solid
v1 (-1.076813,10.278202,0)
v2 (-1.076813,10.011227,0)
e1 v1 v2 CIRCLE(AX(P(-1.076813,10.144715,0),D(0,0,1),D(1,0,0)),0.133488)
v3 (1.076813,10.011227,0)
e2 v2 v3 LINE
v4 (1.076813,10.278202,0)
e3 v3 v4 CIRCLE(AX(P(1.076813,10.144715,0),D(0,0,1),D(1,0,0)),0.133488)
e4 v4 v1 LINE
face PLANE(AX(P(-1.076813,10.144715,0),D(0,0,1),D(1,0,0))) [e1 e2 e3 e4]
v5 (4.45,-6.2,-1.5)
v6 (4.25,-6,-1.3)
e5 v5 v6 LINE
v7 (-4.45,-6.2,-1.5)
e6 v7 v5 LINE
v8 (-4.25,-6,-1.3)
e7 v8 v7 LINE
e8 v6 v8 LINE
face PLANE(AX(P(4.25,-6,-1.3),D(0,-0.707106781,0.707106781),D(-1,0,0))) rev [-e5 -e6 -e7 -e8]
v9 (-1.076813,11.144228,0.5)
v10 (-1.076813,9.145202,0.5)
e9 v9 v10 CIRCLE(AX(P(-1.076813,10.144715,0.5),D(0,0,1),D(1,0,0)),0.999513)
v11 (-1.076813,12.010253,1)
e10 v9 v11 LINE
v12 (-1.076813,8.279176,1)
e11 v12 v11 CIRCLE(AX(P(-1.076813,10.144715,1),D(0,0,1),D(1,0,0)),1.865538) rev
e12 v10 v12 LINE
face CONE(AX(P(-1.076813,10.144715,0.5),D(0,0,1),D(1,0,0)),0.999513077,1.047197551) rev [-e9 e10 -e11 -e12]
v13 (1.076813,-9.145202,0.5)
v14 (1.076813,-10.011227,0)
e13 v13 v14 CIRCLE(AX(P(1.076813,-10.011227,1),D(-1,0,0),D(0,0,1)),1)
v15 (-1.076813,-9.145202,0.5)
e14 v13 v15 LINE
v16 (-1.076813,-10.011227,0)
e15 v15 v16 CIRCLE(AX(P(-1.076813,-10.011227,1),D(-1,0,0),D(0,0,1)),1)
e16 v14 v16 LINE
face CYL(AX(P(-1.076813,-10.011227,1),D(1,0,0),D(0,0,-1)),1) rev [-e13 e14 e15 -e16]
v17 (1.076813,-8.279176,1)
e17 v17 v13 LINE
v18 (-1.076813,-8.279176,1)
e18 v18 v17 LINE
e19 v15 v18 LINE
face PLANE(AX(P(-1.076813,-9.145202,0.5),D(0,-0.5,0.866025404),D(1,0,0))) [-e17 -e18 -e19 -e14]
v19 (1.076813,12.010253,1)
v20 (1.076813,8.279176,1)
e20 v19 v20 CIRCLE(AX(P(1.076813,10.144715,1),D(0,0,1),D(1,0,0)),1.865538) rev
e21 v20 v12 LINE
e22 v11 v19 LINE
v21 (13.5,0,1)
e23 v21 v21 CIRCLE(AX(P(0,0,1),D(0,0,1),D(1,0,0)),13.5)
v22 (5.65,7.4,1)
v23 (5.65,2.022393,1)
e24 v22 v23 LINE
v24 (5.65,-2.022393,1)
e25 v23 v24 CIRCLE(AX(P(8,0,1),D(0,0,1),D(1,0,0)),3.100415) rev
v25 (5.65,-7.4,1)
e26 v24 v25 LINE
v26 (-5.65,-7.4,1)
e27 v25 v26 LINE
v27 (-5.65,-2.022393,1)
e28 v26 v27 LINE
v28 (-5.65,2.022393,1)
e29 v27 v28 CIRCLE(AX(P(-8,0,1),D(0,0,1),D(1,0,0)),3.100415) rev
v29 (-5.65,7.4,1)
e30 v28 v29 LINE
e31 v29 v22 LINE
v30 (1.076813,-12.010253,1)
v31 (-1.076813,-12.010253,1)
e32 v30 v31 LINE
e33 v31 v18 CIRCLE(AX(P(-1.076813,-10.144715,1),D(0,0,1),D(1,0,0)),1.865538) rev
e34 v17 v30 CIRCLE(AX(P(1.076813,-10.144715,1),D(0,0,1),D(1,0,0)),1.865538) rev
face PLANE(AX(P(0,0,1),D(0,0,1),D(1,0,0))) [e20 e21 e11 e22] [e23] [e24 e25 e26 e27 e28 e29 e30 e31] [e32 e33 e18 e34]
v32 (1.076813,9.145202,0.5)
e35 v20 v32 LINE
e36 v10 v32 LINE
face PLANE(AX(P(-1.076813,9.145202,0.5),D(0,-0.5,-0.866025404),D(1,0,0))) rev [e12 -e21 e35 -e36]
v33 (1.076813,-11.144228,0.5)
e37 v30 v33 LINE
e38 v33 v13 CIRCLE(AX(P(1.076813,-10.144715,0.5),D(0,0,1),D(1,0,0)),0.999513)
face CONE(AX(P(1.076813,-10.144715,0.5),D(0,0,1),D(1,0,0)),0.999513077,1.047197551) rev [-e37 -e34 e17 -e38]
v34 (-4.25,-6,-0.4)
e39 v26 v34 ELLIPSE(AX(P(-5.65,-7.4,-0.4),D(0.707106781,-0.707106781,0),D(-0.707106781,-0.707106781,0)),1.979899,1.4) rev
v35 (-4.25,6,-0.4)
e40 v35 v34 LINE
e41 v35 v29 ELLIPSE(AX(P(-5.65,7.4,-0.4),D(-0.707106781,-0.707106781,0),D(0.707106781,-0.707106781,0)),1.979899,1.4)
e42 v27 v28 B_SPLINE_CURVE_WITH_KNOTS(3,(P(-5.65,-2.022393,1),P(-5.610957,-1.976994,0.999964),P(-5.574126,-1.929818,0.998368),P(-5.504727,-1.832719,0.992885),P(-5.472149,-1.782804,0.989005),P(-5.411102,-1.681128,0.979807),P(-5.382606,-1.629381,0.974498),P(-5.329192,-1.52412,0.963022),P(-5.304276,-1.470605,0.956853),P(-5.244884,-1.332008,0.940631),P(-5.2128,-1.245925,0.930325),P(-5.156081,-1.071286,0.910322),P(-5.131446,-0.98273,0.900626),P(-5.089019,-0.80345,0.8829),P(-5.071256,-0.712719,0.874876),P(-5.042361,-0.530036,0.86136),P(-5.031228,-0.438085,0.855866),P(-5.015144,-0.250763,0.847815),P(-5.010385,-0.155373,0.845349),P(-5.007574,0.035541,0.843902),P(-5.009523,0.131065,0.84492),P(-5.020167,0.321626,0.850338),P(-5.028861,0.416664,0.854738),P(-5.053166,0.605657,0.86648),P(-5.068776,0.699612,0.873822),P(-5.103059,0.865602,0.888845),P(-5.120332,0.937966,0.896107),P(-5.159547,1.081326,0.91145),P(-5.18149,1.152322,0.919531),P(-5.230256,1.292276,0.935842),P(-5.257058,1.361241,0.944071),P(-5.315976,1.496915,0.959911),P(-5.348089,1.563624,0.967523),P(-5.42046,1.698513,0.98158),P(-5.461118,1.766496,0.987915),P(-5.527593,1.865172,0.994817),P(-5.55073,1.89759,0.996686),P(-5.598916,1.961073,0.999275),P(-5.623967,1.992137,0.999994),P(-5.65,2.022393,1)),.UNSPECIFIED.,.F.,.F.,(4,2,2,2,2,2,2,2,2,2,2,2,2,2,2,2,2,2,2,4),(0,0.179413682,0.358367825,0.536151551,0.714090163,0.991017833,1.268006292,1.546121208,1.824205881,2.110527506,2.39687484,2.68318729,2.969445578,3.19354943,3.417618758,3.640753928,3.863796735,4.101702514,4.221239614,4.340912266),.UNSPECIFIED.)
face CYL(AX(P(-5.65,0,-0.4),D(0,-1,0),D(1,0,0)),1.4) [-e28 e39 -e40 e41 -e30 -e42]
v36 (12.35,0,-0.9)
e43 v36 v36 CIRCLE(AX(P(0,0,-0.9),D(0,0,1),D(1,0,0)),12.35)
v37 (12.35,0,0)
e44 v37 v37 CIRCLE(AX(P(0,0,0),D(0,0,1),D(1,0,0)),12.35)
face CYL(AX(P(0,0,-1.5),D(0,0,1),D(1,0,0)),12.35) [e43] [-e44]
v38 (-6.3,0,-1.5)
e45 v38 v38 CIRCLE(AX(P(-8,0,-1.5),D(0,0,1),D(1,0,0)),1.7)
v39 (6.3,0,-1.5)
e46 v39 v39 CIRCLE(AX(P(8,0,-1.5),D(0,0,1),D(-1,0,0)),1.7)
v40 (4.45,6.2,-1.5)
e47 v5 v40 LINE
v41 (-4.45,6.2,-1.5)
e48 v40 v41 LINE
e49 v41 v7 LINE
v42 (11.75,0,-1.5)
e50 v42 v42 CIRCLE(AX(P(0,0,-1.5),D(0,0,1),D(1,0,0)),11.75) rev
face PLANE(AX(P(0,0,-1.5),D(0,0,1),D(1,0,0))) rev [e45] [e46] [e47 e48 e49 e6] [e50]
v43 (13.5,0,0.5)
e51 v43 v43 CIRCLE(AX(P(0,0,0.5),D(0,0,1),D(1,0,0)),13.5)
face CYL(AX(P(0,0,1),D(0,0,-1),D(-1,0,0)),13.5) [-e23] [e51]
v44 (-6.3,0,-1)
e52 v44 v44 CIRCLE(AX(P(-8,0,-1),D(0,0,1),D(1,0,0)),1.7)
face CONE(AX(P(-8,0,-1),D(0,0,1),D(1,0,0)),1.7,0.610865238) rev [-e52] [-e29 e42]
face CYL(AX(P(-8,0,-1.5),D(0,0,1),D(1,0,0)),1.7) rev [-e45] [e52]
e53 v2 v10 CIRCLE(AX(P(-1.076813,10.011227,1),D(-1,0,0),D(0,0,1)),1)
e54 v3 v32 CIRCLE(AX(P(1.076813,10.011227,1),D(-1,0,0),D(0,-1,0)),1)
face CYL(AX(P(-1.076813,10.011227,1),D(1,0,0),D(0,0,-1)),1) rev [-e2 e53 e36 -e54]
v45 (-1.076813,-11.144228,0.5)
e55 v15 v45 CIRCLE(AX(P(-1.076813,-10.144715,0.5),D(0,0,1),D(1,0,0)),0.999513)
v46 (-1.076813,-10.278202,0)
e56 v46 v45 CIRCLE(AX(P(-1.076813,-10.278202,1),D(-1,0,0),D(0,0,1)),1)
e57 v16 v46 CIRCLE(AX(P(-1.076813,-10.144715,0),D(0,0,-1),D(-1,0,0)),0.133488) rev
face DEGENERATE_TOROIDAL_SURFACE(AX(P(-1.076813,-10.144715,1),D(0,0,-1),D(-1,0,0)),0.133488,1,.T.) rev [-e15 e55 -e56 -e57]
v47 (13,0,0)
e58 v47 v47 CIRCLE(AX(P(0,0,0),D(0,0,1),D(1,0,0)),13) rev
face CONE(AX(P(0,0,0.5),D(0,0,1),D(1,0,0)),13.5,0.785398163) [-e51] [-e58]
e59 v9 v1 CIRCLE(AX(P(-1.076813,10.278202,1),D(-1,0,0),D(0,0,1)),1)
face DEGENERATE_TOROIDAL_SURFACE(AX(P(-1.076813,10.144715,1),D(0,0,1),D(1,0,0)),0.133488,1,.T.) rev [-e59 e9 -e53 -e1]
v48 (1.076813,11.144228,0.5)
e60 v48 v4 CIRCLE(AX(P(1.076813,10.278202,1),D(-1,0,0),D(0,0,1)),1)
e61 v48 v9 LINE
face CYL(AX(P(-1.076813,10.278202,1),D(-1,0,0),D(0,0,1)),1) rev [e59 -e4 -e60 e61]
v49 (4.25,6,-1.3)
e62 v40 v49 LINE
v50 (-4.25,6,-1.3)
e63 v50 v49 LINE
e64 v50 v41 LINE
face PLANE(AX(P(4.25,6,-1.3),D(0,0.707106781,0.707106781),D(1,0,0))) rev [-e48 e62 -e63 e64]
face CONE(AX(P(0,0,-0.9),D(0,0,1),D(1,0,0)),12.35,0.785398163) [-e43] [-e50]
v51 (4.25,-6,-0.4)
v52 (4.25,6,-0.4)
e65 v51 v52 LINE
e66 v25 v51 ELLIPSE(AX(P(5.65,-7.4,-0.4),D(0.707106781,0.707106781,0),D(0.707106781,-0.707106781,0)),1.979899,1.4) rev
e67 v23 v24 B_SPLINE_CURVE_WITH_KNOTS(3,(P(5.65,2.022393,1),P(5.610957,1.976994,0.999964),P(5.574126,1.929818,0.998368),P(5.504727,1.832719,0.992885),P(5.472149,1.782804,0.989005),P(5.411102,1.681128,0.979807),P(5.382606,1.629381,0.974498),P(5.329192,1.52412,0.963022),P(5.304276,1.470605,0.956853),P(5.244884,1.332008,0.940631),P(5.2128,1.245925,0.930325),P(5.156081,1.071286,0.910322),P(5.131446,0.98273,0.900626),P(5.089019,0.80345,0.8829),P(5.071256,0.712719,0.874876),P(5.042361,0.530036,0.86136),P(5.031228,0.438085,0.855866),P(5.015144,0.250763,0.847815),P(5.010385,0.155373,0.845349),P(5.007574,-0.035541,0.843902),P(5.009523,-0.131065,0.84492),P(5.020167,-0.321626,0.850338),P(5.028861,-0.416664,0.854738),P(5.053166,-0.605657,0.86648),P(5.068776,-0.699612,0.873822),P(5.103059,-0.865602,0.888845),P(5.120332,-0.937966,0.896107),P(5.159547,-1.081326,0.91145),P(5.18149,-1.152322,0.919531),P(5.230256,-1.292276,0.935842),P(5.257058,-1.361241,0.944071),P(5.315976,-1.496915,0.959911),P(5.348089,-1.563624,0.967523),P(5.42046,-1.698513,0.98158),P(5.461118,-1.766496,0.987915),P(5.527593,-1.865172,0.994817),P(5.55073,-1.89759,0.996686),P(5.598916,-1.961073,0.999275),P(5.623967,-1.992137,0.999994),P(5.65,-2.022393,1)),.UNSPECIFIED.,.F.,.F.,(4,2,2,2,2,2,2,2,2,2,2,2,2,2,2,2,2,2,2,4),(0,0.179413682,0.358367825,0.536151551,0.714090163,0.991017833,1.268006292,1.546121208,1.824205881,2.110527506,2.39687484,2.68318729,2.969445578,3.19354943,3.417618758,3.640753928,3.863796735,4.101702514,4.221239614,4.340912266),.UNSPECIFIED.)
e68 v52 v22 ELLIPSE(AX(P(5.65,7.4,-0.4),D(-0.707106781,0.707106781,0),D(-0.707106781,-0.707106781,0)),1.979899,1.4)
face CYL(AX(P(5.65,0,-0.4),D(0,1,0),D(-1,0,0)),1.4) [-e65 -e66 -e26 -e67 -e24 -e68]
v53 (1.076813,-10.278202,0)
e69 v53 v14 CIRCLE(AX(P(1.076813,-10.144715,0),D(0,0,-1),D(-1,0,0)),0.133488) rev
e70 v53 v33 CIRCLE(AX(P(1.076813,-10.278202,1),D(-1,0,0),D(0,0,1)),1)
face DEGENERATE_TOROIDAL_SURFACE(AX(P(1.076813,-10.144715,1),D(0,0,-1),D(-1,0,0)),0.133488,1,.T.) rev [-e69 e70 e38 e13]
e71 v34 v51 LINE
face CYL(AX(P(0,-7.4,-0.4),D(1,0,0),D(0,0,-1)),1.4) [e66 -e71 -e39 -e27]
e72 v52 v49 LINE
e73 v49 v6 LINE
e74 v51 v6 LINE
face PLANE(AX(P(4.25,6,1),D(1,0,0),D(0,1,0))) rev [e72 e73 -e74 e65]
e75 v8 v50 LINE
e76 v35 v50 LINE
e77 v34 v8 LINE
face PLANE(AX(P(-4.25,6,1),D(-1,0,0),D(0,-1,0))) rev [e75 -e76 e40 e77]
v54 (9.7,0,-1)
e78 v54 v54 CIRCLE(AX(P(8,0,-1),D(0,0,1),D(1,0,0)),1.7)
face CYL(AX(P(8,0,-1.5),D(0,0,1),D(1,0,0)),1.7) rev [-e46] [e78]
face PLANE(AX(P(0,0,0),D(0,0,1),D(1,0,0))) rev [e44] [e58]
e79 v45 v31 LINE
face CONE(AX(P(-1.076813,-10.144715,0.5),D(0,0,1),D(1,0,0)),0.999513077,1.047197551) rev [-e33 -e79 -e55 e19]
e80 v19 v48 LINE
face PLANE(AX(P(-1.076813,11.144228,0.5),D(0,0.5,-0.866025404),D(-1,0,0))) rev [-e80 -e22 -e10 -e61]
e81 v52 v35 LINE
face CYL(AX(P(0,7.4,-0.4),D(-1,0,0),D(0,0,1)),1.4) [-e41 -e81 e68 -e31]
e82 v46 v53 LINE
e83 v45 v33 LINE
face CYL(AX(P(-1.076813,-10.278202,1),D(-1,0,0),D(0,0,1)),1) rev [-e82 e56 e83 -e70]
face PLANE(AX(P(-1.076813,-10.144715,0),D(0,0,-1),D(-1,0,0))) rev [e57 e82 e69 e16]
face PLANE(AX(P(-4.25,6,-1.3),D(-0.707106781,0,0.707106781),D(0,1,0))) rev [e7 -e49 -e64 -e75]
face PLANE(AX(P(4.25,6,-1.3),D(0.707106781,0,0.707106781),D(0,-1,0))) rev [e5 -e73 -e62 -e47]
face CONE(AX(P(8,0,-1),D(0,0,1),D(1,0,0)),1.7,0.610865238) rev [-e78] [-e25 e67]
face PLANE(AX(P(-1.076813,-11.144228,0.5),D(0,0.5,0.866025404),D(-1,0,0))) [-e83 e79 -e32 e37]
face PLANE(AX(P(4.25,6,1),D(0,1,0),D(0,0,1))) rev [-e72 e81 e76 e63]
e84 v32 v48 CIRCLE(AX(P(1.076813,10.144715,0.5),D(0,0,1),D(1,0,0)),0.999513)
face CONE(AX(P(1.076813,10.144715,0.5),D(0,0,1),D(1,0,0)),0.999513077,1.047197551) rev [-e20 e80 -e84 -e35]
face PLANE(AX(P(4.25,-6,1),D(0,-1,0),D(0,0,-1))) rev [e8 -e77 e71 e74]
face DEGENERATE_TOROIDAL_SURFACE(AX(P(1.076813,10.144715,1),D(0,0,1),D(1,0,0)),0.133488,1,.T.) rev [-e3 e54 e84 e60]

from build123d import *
from OCP.BRepFilletAPI import BRepFilletAPI_MakeChamfer

# Parameters (mm, degrees)
SKETCH1_R           = 12.35
SKETCH1_R_2         = 1.7
BOSS_EXTRUDE1_DEPTH = 1.5
BOSS_EXTRUDE3_START = 1
SKETCH3_R           = 13.5
SKETCH3_R_2         = 1.7
BOSS_EXTRUDE3_DEPTH = 1
CHAMFER2_SIZE       = 0.5
CHAMFER3_SIZE       = 2
CHAMFER3_SIZE2      = 1.400415076
SKETCH2_W           = 8.5
SKETCH2_H           = 12
CUT_EXTRUDE2_DEPTH  = 20.254869514
CHAMFER4_SIZE       = 0.2
CHAMFER5_SIZE       = 0.6
FILLET1_START       = -6
FILLET1_DEPTH       = 12
FILLET1_START_2     = -5.6500001
FILLET1_2_DEPTH     = 11.3000001
FILLET1_START_3     = -8
FILLET1_3_DEPTH     = 2
FILLET1_START_4     = 6
FILLET1_4_DEPTH     = 2
CUT_EXTRUDE3_DEPTH  = 1
FILLET2_R           = 1


with BuildPart() as part:
    # Sketch1 → Boss-Extrude1 (new body)
    with BuildSketch(Plane.XY):
        Circle(SKETCH1_R)
        with Locations((-8, 0)):
            Circle(SKETCH1_R_2, mode=Mode.SUBTRACT)
        with Locations(Location((8, 0, 0), (0, 0, 180))):
            Circle(SKETCH1_R_2, mode=Mode.SUBTRACT)
    extrude(amount=-BOSS_EXTRUDE1_DEPTH)

    # Sketch3 → Boss-Extrude3 (add)
    with BuildSketch(Plane.XY.offset(BOSS_EXTRUDE3_START)):
        Circle(SKETCH3_R)
        with Locations((-8, 0)):
            Circle(SKETCH3_R_2, mode=Mode.SUBTRACT)
        with Locations((8, 0)):
            Circle(SKETCH3_R_2, mode=Mode.SUBTRACT)
    extrude(amount=-BOSS_EXTRUDE3_DEPTH)

    # Chamfer2
    chamfer2_edges = [part.edges().sort_by_distance(p)[0] for p in [
        (-13.5, 0, 0),
    ]]
    chamfer(chamfer2_edges, length=CHAMFER2_SIZE)

    # Chamfer3: one chamfer whose edges measure the first distance from different faces: ONE call of the kernel's chamfer builder (chamfer() names one face for all edges)
    chamfer3_edges_1 = [part.edges().sort_by_distance(p)[0] for p in [
        (-9.7, 0, 1),
    ]]
    chamfer3_side_1 = [part.faces().sort_by_distance(p)[0] for p in [
        (-9.7, 0, -0.25),
    ]]
    chamfer3_edges_2 = [part.edges().sort_by_distance(p)[0] for p in [
        (6.3, 0, 1),
    ]]
    chamfer3_side_2 = [part.faces().sort_by_distance(p)[0] for p in [
        (8, -1.7, -0.25),
    ]]
    chamfer3 = BRepFilletAPI_MakeChamfer(part.part.solid().wrapped)
    for e in chamfer3_edges_1:
        chamfer3.Add(CHAMFER3_SIZE, CHAMFER3_SIZE2, e.wrapped, chamfer3_side_1[0].wrapped)  # the first distance lies on this face
    for e in chamfer3_edges_2:
        chamfer3.Add(CHAMFER3_SIZE, CHAMFER3_SIZE2, e.wrapped, chamfer3_side_2[0].wrapped)  # the first distance lies on this face
    add(Compound.cast(chamfer3.Shape()), mode=Mode.REPLACE)

    # Sketch2 → Cut-Extrude2 (cut, through all)
    with BuildSketch(Plane(origin=(0, 0, -1.5), x_dir=(-1, 0, 0), z_dir=(0, 0, -1))):
        Rectangle(SKETCH2_W, SKETCH2_H)
    extrude(amount=-CUT_EXTRUDE2_DEPTH, mode=Mode.SUBTRACT)

    # Chamfer4
    chamfer4_edges = [part.edges().sort_by_distance(p)[0] for p in [
        (-4.25, 0, -1.5),
        (0, 6, -1.5),
        (4.25, 0, -1.5),
        (0, -6, -1.5),
    ]]
    chamfer(chamfer4_edges, length=CHAMFER4_SIZE)

    # Chamfer5
    chamfer5_edges = [part.edges().sort_by_distance(p)[0] for p in [
        (-12.35, 0, -1.5),
    ]]
    chamfer(chamfer5_edges, length=CHAMFER5_SIZE)

    # Fillet1: read off the stored shape, not the designer's step
    # Fillet1 outline → Fillet1 (cut)
    with BuildSketch(Plane(origin=(0, 0, 0), x_dir=(1, 0, 0), z_dir=(0, 1, 0)).offset(FILLET1_START)):
        with BuildLine():
            Line((-5.65, -1), (-4.25, -1))
            Line((-4.25, -1), (-4.25, 0.4))
            ThreePointArc((-4.25, 0.4), (-4.660050506, -0.589949494), (-5.65, -1))
        make_face()
        with BuildLine():
            ThreePointArc((5.65, -1), (4.660050506, -0.589949494), (4.25, 0.4))
            Line((4.25, 0.4), (4.25, -1))
            Line((4.25, -1), (5.65, -1))
        make_face()
    extrude(amount=FILLET1_DEPTH, mode=Mode.SUBTRACT)

    # Fillet1 2 outline → Fillet1 2 (cut)
    with BuildSketch(Plane.YZ.offset(FILLET1_START_2)):
        with BuildLine():
            Line((7.4, 1), (6, 1))
            Line((6, 1), (6, -0.4))
            ThreePointArc((6, -0.4), (6.410050506, 0.589949494), (7.4, 1))
        make_face()
        with BuildLine():
            ThreePointArc((-7.4, 1), (-6.410050506, 0.589949494), (-6, -0.4))
            Line((-6, -0.4), (-6, 1))
            Line((-6, 1), (-7.4, 1))
        make_face()
    extrude(amount=FILLET1_2_DEPTH, mode=Mode.SUBTRACT)

    # Fillet1 3 outline → Fillet1 3 (add)
    with BuildSketch(Plane(origin=(0, 0, 0), x_dir=(1, 0, 0), z_dir=(0, 1, 0)).offset(FILLET1_START_3)):
        with BuildLine():
            ThreePointArc((4.25, 0.4), (4.660050506, -0.589949494), (5.65, -1))
            Line((5.65, -1), (5.65, 0.4))
            Line((5.65, 0.4), (4.25, 0.4))
        make_face()
        with BuildLine():
            Line((-5.6500001, 0.4), (-5.65, -1))
            ThreePointArc((-5.65, -1), (-4.660050506, -0.589949494), (-4.25, 0.4))
            Line((-4.25, 0.4), (-5.6500001, 0.4))
        make_face()
    extrude(amount=FILLET1_3_DEPTH)

    # Fillet1 4 outline → Fillet1 4 (add)
    with BuildSketch(Plane(origin=(0, 0, 0), x_dir=(1, 0, 0), z_dir=(0, 1, 0)).offset(FILLET1_START_4)):
        with BuildLine():
            ThreePointArc((4.25, 0.4), (4.660050506, -0.589949494), (5.65, -1))
            Line((5.65, -1), (5.65, 0.4))
            Line((5.65, 0.4), (4.25, 0.4))
        make_face()
        with BuildLine():
            Line((-5.6500001, 0.4), (-5.65, -1))
            ThreePointArc((-5.65, -1), (-4.660050506, -0.589949494), (-4.25, 0.4))
            Line((-4.25, 0.4), (-5.6500001, 0.4))
        make_face()
    extrude(amount=FILLET1_4_DEPTH)

    # Sketch4 → Cut-Extrude3 (cut)
    with BuildSketch(Plane.XY.offset(1)):
        with BuildLine():
            Line((-1.07681329, 11.278202352), (1.07681329, 11.278202352))
            ThreePointArc((1.07681329, 11.278202352), (2.210300963, 10.144714678), (1.07681329, 9.011227005))
            Line((1.07681329, 9.011227005), (-1.07681329, 9.011227005))
            ThreePointArc((-1.07681329, 9.011227005), (-2.210300963, 10.144714678), (-1.07681329, 11.278202352))
        make_face()
        with BuildLine():
            Line((-1.07681329, -11.278202352), (1.07681329, -11.278202352))
            ThreePointArc((1.07681329, -11.278202352), (2.210300963, -10.144714678), (1.07681329, -9.011227005))
            Line((1.07681329, -9.011227005), (-1.07681329, -9.011227005))
            ThreePointArc((-1.07681329, -9.011227005), (-2.210300963, -10.144714678), (-1.07681329, -11.278202352))
        make_face()
    extrude(amount=-CUT_EXTRUDE3_DEPTH, mode=Mode.SUBTRACT)

    # Fillet2
    fillet2_edges = [part.edges().sort_by_distance(p)[0] for p in [
        (2.210300963, -10.144714678, 0),
        (0, -11.278202352, 0),
        (-2.210300963, -10.144714678, 0),
        (0, -9.011227005, 0),
        (2.210300963, 10.144714678, 0),
        (0, 9.011227005, 0),
        (-2.210300963, 10.144714678, 0),
        (0, 11.278202352, 0),
    ]]
    fillet(fillet2_edges, radius=FILLET2_R - 0.0001)  # a hair under: the kernel refuses the full size

    # Chamfer6: read off the stored shape, not the designer's step
    # Chamfer6: loft between two sections, ruled curve by curve
    chamfer6_from = [
        Edge.make_three_point_arc((-1.07681329, 11.144227755, 0.5), (-1.783575765, 10.851477153, 0.5), (-2.076326367, 10.144714678, 0.5)),
        Edge.make_three_point_arc((-2.076326367, 10.144714678, 0.5), (-1.783575765, 9.437952203, 0.5), (-1.07681329, 9.145201601, 0.5)),
        Edge.make_three_point_arc((1.07681329, 9.145201601, 0.5), (1.783575765, 9.437952203, 0.5), (2.076326367, 10.144714678, 0.5)),
        Edge.make_three_point_arc((2.076326367, 10.144714678, 0.5), (1.783575765, 10.851477153, 0.5), (1.07681329, 11.144227755, 0.5)),
        Edge.make_line((1.07681329, 11.144227755, 0.5), (-1.07681329, 11.144227755, 0.5)),
        Edge.make_line((-1.07681329, 9.145201601, 0.5), (1.07681329, 9.145201601, 0.5)),
    ]
    chamfer6_to = [
        Edge.make_three_point_arc((-1.07681329, 12.010253159, 1), (-2.3959482, 11.463849589, 1), (-2.942351771, 10.144714678, 1)),
        Edge.make_three_point_arc((-2.942351771, 10.144714678, 1), (-2.3959482, 8.825579768, 1), (-1.07681329, 8.279176197, 1)),
        Edge.make_three_point_arc((1.07681329, 8.279176197, 1), (2.3959482, 8.825579768, 1), (2.942351771, 10.144714678, 1)),
        Edge.make_three_point_arc((2.942351771, 10.144714678, 1), (2.3959482, 11.463849589, 1), (1.07681329, 12.010253159, 1)),
        Edge.make_line((1.07681329, 12.010253159, 1), (-1.07681329, 12.010253159, 1)),
        Edge.make_line((-1.07681329, 8.279176197, 1), (1.07681329, 8.279176197, 1)),
    ]
    chamfer6 = Solid(Shell([*[Face.make_surface_from_curves(chamfer6_from[k], chamfer6_to[k]) for k in range(6)], Face(Wire(chamfer6_from)), Face(Wire(chamfer6_to))]))
    add(chamfer6, mode=Mode.SUBTRACT)

    # Chamfer6 2: loft between two sections, ruled curve by curve
    chamfer6_2_from = [
        Edge.make_three_point_arc((-1.07681329, -9.145201601, 0.5), (-1.783575765, -9.437952203, 0.5), (-2.076326367, -10.144714678, 0.5)),
        Edge.make_three_point_arc((-2.076326367, -10.144714678, 0.5), (-1.783575765, -10.851477153, 0.5), (-1.07681329, -11.144227755, 0.5)),
        Edge.make_three_point_arc((1.07681329, -11.144227755, 0.5), (1.783575765, -10.851477153, 0.5), (2.076326367, -10.144714678, 0.5)),
        Edge.make_three_point_arc((2.076326367, -10.144714678, 0.5), (1.783575765, -9.437952203, 0.5), (1.07681329, -9.145201601, 0.5)),
        Edge.make_line((1.07681329, -9.145201601, 0.5), (-1.07681329, -9.145201601, 0.5)),
        Edge.make_line((-1.07681329, -11.144227755, 0.5), (1.07681329, -11.144227755, 0.5)),
    ]
    chamfer6_2_to = [
        Edge.make_three_point_arc((-1.07681329, -8.279176197, 1), (-2.3959482, -8.825579768, 1), (-2.942351771, -10.144714678, 1)),
        Edge.make_three_point_arc((-2.942351771, -10.144714678, 1), (-2.3959482, -11.463849589, 1), (-1.07681329, -12.010253159, 1)),
        Edge.make_three_point_arc((1.07681329, -12.010253159, 1), (2.3959482, -11.463849589, 1), (2.942351771, -10.144714678, 1)),
        Edge.make_three_point_arc((2.942351771, -10.144714678, 1), (2.3959482, -8.825579768, 1), (1.07681329, -8.279176197, 1)),
        Edge.make_line((1.07681329, -8.279176197, 1), (-1.07681329, -8.279176197, 1)),
        Edge.make_line((-1.07681329, -12.010253159, 1), (1.07681329, -12.010253159, 1)),
    ]
    chamfer6_2 = Solid(Shell([*[Face.make_surface_from_curves(chamfer6_2_from[k], chamfer6_2_to[k]) for k in range(6)], Face(Wire(chamfer6_2_from)), Face(Wire(chamfer6_2_to))]))
    add(chamfer6_2, mode=Mode.SUBTRACT)


solid = part.part
